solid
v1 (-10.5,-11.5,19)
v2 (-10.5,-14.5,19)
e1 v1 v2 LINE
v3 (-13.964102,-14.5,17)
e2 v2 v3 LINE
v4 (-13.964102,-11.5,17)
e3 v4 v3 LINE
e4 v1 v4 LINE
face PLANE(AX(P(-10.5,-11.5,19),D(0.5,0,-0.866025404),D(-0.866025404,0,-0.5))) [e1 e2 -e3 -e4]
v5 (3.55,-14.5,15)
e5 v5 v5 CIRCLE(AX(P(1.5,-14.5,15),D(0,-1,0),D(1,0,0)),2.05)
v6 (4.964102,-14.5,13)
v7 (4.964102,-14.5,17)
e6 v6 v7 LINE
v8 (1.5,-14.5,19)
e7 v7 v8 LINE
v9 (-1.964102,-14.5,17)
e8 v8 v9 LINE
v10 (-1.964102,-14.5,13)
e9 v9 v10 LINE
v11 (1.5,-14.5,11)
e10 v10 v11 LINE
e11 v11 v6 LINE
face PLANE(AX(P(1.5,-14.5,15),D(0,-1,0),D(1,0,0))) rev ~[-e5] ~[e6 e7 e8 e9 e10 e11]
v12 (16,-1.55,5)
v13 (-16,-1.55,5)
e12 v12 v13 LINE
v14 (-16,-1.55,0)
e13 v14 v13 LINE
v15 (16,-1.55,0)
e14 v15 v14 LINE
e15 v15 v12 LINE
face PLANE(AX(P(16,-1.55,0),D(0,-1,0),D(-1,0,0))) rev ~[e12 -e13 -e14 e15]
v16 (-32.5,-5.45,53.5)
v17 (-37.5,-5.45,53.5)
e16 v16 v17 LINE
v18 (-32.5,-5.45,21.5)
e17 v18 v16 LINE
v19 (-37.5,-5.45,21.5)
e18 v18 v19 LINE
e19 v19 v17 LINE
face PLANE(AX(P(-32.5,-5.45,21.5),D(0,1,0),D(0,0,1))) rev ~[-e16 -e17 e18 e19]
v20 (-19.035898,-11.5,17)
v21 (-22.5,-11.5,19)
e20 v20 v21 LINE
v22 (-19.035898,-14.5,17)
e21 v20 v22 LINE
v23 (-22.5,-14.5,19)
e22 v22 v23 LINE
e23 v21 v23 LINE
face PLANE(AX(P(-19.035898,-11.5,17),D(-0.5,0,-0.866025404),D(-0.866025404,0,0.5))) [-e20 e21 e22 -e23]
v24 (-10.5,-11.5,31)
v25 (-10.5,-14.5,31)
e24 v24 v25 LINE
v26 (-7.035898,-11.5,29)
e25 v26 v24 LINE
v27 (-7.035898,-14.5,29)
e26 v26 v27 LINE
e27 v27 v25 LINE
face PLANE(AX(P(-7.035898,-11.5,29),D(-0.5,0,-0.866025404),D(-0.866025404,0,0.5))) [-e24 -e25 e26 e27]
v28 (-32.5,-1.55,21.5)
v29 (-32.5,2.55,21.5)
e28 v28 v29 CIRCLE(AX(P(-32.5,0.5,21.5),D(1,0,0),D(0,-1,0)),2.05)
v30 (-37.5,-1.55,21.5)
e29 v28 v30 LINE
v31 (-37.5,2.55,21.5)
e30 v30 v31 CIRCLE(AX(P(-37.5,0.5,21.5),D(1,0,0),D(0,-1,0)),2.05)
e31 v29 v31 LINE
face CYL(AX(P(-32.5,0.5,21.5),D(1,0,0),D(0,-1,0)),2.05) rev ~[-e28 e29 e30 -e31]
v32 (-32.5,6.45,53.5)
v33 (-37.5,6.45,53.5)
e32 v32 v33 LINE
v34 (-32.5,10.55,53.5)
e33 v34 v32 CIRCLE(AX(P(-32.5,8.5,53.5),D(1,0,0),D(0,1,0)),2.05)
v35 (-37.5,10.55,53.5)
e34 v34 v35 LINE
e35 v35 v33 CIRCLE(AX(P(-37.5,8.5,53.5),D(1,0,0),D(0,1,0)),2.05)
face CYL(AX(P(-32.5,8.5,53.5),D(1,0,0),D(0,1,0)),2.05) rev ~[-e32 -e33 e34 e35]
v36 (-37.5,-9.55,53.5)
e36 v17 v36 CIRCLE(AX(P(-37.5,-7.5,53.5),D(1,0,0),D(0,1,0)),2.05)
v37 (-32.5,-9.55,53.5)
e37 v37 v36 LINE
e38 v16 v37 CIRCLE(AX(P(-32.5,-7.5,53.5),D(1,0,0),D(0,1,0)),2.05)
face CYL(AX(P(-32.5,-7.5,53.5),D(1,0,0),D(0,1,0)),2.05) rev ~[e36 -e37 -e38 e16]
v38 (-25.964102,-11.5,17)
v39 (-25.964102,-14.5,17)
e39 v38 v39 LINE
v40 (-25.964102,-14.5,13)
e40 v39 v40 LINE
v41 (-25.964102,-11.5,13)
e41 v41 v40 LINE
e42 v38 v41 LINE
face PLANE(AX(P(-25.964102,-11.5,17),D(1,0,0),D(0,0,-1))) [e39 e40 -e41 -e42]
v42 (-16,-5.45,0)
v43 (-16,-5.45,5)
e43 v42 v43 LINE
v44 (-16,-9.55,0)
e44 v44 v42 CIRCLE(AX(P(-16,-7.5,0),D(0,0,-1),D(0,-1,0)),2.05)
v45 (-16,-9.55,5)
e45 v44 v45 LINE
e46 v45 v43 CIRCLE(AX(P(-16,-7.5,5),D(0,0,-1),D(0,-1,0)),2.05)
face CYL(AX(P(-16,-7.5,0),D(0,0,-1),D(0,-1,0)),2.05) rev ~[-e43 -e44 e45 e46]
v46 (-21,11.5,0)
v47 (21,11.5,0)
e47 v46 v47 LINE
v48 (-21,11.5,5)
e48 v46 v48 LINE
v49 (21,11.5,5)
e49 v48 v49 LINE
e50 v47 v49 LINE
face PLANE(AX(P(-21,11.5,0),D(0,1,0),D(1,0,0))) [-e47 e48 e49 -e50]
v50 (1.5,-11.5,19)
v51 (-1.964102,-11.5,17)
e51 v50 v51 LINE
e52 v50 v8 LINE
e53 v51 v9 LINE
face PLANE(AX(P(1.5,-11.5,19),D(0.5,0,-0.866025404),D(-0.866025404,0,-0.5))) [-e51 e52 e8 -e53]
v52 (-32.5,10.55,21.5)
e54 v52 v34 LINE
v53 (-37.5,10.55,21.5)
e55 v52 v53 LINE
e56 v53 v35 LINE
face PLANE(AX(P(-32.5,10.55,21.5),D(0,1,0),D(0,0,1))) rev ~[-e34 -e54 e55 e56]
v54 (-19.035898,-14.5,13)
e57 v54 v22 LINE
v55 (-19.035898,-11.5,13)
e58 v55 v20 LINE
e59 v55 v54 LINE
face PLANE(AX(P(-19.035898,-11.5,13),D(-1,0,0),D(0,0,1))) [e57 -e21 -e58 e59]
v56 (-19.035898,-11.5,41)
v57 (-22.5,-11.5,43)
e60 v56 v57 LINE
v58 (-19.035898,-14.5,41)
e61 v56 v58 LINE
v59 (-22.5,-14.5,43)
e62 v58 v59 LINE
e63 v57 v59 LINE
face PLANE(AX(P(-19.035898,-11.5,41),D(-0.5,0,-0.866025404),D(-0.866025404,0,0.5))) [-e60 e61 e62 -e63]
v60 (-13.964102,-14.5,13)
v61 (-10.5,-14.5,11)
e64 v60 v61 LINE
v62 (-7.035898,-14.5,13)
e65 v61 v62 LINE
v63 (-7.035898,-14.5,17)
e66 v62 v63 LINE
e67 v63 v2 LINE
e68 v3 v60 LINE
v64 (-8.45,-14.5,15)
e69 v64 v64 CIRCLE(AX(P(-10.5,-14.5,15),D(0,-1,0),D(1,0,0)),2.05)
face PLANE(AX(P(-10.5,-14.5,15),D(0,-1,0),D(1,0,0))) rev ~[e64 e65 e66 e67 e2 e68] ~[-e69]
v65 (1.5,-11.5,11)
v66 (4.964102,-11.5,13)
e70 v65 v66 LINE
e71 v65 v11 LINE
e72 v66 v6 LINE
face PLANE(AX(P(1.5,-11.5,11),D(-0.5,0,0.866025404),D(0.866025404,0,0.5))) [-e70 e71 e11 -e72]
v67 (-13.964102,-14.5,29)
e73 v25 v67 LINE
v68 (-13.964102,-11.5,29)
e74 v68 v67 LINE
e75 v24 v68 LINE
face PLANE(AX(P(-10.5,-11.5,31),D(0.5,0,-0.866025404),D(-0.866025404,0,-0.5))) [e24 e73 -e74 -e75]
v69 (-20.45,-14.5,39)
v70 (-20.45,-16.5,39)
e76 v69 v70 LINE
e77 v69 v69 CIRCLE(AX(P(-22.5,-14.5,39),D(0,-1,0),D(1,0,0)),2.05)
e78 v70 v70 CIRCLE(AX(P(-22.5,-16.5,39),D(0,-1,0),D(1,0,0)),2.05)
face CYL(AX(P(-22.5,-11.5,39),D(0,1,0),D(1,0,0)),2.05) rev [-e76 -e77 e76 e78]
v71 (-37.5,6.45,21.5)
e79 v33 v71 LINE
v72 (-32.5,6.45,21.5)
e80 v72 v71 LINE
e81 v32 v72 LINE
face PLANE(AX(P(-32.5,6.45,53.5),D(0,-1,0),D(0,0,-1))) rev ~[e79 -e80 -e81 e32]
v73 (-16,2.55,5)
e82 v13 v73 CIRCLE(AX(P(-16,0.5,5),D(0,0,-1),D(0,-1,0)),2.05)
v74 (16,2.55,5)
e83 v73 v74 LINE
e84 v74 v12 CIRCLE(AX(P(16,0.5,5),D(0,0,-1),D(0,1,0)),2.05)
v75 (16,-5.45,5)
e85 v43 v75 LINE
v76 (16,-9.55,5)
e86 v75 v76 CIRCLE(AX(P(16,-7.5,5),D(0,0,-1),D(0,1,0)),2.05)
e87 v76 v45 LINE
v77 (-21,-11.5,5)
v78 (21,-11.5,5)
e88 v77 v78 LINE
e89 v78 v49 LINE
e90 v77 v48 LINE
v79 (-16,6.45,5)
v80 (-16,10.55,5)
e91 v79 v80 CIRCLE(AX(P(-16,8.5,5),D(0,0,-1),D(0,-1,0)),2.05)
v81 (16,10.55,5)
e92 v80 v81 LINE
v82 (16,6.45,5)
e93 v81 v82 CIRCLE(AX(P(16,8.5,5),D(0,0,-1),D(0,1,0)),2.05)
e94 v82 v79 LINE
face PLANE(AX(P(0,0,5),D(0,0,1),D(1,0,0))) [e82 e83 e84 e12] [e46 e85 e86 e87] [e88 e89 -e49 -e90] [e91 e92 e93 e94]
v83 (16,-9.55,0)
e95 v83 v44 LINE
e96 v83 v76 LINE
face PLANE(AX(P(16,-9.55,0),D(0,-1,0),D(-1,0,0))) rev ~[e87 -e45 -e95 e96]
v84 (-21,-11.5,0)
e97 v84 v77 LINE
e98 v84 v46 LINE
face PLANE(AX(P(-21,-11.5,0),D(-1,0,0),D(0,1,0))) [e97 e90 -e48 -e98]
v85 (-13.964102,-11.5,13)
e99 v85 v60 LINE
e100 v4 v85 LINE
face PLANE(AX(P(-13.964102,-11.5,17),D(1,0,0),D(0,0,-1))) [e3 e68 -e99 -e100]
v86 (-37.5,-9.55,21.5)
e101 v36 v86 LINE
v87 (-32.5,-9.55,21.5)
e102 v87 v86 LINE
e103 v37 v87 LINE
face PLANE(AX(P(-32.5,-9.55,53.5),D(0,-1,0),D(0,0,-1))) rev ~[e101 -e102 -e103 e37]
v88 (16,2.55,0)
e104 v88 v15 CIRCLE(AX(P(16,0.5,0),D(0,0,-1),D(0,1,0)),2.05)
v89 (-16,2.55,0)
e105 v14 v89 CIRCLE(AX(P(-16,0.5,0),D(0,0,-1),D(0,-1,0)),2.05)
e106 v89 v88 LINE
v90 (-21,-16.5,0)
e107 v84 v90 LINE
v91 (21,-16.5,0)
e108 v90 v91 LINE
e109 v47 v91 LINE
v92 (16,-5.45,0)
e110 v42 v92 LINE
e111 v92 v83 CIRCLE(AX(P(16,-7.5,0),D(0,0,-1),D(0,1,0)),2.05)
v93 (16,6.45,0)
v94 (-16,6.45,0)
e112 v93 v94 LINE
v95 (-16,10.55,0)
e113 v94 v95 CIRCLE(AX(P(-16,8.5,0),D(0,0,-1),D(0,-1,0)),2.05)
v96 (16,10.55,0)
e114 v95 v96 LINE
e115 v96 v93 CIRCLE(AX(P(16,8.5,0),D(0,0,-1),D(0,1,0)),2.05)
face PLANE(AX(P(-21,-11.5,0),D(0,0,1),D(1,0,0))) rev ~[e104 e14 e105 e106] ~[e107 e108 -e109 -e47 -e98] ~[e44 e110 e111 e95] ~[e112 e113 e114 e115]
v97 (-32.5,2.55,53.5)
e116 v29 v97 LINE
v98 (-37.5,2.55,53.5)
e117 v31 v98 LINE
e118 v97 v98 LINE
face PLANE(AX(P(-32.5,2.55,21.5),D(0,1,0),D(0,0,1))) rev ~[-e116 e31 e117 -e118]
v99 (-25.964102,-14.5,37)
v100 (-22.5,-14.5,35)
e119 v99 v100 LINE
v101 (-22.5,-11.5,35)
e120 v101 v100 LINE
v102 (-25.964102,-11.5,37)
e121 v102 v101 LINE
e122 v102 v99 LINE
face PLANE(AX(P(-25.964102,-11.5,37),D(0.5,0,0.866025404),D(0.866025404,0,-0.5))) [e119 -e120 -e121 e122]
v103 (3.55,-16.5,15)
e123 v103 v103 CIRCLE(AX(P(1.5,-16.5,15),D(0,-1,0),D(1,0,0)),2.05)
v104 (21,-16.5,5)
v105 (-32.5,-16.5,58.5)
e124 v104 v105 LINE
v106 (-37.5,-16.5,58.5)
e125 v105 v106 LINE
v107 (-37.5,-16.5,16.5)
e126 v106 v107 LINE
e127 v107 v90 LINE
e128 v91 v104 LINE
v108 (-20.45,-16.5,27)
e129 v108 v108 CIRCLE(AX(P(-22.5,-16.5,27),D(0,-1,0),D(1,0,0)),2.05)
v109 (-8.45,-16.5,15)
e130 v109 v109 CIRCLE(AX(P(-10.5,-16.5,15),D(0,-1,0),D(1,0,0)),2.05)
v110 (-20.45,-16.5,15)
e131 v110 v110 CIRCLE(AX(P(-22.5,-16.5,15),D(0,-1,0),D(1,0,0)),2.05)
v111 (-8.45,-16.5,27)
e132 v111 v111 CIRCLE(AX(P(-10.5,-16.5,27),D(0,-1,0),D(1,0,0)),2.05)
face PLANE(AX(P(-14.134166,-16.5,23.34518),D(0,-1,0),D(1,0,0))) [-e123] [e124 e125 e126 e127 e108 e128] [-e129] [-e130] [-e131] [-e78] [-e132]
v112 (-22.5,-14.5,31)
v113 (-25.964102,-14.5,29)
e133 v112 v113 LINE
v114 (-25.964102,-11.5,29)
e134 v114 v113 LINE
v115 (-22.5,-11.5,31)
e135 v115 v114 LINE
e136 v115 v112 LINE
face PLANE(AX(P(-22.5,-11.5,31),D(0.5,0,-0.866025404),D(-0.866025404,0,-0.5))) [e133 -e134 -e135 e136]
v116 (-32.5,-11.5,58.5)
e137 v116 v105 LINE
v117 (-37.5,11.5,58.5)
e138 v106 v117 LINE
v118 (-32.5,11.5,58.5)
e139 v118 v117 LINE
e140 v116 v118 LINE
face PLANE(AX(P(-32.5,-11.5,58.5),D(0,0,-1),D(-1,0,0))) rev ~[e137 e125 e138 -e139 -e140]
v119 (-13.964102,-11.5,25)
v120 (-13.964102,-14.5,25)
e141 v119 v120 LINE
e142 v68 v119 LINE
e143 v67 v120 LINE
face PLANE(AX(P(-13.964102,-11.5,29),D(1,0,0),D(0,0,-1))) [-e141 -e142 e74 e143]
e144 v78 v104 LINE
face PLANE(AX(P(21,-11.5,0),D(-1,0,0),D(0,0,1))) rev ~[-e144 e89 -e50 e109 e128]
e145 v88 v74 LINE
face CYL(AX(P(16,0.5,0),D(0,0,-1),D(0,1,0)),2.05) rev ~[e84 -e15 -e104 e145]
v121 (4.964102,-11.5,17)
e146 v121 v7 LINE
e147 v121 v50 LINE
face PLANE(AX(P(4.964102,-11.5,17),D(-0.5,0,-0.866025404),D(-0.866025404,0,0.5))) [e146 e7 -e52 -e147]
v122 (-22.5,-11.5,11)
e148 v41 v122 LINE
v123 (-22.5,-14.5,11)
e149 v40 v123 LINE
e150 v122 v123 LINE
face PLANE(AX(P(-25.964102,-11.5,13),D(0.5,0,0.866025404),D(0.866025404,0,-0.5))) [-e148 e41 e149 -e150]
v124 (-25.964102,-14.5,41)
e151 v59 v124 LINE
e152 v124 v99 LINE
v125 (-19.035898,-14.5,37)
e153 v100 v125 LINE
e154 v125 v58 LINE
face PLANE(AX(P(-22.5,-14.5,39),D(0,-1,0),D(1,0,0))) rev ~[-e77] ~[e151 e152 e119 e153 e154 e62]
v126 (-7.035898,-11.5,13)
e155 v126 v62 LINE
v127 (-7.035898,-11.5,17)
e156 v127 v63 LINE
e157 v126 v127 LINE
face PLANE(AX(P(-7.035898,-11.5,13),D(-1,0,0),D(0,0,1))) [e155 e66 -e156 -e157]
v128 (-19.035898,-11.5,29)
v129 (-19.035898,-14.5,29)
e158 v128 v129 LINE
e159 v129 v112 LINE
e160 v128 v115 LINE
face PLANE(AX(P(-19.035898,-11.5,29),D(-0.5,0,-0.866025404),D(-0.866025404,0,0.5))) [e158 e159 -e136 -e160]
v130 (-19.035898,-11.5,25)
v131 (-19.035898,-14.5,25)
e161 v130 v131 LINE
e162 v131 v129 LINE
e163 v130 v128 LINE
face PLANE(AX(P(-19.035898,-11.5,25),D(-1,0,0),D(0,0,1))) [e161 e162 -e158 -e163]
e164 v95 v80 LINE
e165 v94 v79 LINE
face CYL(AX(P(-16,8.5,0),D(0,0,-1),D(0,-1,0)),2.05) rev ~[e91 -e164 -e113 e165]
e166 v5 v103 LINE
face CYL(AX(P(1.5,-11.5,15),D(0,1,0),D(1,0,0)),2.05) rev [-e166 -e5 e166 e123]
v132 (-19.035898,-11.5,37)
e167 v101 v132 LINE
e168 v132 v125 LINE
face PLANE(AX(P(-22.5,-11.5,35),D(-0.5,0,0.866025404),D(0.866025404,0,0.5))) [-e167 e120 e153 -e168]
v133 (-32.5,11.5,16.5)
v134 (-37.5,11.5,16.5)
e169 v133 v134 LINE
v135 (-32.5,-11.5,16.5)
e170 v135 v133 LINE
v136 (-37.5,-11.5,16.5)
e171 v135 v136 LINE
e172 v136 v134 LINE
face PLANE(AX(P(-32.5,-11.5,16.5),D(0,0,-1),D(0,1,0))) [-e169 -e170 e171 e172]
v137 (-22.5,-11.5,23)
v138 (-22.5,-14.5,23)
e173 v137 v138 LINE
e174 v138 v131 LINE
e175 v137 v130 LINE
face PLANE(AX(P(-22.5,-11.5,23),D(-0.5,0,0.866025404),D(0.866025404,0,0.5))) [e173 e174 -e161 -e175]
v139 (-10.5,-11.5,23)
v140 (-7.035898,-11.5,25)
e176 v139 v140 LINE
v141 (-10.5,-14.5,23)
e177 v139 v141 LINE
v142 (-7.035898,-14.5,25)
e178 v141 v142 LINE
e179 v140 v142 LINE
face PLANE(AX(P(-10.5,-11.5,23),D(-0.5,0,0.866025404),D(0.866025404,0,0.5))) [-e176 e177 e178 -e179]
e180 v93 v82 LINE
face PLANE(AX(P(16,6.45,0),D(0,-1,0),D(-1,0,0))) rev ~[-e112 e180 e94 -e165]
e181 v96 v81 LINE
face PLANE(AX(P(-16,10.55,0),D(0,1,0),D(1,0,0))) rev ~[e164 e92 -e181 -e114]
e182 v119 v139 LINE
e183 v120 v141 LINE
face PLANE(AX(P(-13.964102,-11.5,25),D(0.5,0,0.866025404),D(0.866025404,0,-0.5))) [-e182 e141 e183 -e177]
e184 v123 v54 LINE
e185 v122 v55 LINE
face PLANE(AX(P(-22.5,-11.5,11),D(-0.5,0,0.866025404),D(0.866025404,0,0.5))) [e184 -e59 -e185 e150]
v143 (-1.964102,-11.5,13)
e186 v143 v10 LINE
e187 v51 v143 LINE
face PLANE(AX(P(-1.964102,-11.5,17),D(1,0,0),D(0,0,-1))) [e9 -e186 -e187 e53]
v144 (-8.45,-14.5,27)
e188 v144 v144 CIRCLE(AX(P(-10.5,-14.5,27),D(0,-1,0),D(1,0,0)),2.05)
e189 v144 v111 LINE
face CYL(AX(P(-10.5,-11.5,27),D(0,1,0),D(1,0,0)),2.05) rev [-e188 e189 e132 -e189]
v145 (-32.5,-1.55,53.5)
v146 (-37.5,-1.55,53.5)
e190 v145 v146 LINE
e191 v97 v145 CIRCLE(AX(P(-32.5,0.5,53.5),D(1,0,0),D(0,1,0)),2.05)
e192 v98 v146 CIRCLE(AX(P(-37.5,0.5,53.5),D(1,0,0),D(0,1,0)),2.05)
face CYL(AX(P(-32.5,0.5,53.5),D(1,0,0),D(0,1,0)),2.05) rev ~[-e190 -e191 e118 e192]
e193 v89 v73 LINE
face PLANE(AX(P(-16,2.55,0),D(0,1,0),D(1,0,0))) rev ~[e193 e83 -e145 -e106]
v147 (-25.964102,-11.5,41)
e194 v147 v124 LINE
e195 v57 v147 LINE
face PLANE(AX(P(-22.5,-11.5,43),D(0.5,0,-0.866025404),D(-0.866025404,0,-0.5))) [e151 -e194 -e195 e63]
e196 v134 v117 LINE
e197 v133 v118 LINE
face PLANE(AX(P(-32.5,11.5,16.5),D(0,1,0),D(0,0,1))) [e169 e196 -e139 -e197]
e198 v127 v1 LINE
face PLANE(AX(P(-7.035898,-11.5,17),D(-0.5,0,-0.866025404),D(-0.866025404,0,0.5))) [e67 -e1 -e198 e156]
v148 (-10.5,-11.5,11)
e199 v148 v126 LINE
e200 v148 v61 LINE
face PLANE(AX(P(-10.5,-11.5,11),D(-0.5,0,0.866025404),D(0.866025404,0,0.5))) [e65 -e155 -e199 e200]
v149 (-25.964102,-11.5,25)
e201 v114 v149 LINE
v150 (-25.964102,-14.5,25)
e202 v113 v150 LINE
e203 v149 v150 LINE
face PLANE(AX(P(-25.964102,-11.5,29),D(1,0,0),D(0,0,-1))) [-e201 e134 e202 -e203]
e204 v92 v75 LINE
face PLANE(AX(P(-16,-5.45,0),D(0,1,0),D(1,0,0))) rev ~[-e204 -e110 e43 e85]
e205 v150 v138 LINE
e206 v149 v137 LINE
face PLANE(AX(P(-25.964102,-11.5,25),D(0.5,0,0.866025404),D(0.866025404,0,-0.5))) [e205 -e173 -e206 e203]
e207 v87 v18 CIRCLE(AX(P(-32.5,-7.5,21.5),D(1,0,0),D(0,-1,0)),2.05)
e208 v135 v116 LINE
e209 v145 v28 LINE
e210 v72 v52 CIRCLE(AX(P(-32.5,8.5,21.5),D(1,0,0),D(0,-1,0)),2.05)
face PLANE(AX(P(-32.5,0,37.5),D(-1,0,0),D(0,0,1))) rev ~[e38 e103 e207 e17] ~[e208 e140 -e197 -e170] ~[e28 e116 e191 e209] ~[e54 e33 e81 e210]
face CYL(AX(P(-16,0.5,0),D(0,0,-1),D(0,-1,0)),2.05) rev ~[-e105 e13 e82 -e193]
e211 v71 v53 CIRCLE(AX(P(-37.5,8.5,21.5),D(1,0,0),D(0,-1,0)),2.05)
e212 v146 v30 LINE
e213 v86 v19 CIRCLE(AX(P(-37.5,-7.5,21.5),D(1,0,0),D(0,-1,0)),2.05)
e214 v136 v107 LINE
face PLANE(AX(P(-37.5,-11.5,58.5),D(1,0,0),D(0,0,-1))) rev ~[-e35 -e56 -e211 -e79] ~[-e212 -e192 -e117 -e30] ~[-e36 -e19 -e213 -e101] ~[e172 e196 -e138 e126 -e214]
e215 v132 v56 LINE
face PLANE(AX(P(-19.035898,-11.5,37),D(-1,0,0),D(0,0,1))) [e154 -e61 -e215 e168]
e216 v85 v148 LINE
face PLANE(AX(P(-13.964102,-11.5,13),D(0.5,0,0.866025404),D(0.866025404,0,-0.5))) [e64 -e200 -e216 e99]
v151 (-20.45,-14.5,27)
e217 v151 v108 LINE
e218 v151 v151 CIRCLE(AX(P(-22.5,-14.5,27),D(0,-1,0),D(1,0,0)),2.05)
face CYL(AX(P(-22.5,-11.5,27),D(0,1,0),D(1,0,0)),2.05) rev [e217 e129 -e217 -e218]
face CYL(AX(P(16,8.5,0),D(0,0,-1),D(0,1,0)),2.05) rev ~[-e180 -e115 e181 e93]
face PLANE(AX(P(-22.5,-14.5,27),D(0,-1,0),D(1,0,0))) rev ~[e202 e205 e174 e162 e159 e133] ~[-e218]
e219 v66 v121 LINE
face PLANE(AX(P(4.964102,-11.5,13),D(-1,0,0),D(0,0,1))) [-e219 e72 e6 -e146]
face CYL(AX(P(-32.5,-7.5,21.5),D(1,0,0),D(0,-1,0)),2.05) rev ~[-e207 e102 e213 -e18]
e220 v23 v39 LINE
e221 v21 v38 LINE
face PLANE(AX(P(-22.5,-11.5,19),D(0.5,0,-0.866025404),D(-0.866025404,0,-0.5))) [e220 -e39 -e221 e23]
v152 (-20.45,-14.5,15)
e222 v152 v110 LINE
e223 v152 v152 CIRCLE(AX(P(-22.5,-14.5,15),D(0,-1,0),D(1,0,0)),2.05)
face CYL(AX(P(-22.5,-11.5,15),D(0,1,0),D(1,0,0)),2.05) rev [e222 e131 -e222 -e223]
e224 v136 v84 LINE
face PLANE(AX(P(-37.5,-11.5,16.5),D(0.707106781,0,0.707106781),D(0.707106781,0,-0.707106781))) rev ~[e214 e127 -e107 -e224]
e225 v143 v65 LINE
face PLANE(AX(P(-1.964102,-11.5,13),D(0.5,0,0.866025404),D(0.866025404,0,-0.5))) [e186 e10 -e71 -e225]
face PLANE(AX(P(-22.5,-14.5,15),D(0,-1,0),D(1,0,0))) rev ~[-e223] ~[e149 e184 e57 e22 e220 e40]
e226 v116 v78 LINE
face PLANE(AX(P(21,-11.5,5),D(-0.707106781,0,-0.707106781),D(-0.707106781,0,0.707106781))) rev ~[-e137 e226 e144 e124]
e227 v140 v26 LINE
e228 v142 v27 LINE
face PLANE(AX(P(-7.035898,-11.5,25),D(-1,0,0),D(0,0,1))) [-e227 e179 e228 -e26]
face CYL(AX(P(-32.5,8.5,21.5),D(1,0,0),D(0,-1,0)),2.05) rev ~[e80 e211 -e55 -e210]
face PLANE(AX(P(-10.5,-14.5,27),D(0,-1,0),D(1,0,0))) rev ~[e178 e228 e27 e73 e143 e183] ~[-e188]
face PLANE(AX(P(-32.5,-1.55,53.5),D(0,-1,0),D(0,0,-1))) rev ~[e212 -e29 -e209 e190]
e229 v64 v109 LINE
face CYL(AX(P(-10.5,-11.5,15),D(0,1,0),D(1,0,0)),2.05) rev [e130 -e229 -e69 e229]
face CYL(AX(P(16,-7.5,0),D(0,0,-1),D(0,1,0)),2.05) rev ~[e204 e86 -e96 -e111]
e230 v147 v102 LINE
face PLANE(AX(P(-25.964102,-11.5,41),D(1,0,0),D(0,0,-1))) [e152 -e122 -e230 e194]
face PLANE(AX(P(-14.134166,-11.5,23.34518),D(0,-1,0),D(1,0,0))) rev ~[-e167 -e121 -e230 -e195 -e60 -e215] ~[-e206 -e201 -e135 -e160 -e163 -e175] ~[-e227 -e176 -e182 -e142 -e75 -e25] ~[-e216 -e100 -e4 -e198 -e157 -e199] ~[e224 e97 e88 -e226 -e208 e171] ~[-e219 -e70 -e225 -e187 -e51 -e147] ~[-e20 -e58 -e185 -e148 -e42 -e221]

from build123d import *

# Parameters (mm, degrees)
F0_W      = 42
F0_H      = 23
F1_DEPTH  = 5
F3_ANGLE  = 90
F8_R      = 2.05
F9_DEPTH  = 5
F10_DEPTH = 3


# Not quite as in the source:
# - a feature names something its author has since deleted; it is built from what else it names


with BuildPart() as f1:
    # F0 (on Top) → F1 (new body)
    with BuildSketch(Plane.XY):
        Rectangle(F0_W, F0_H)
        with BuildLine():
            ThreePointArc((-16, -9.55), (-18.05, -7.5), (-16, -5.45))
            Line((-16, -5.45), (16, -5.45))
            ThreePointArc((16, -5.45), (18.05, -7.5), (16, -9.55))
            Line((16, -9.55), (-16, -9.55))
        make_face(mode=Mode.SUBTRACT)
        with BuildLine():
            Line((0, -1.55), (-16, -1.55))
            ThreePointArc((-16, -1.55), (-18.05, 0.5), (-16, 2.55))
            Line((-16, 2.55), (0, 2.55))
            Line((0, 2.55), (16, 2.55))
            ThreePointArc((16, 2.55), (18.05, 0.5), (16, -1.55))
            Line((16, -1.55), (0, -1.55))
        make_face(mode=Mode.SUBTRACT)
        with BuildLine():
            Line((16, 6.45), (-16, 6.45))
            ThreePointArc((-16, 6.45), (-18.05, 8.5), (-16, 10.55))
            Line((-16, 10.55), (16, 10.55))
            ThreePointArc((16, 10.55), (18.05, 8.5), (16, 6.45))
        make_face(mode=Mode.SUBTRACT)
    extrude(amount=F1_DEPTH)


with BuildPart() as f3_1:
    # F3: copy of F1
    add(f1.part.rotate(Axis((-21, 0, 2.5), (0, -1, 0)), F3_ANGLE))


with BuildPart() as f3_1_1:
    # F4: moved
    add(f3_1.part.moved(Location((0, 0, 14))))


with BuildPart() as f3_1_2:
    # F5: moved
    add(f3_1_1.part.moved(Location((-14, 0, 0))))


with BuildPart() as f1_1:
    add(f1.part)

    add(f3_1_2.part)  # F9 merges F3_1
    # F8 (on 3pt) → F9 (join)
    with BuildSketch(Plane.XZ.offset(11.5)):
        Polygon((-37.5, 16.5), (-21, 0), (21, 0), (21, 5), (14.4509618943, 11.5490381057), (13.5, 11), (10.0358983849, 13), (10.0358983849, 15.9641016151), (2.4509618943, 23.5490381057), (1.5, 23), (-1.9641016151, 25), (-1.9641016151, 27.9641016151), (-9.5490381057, 35.5490381057), (-10.5, 35), (-13.9641016151, 37), (-13.9641016151, 39.9641016151), (-21.5490381057, 47.5490381057), (-22.5, 47), (-25.9641016151, 49), (-25.9641016151, 51.9641016151), (-32.5, 58.5), (-37.5, 58.5), align=None)
        Polygon((-25.9641016151, 17), (-22.5, 19), (-19.0358983849, 17), (-19.0358983849, 13), (-22.5, 11), (-25.9641016151, 13), align=None, mode=Mode.SUBTRACT)
        Polygon((-13.9641016151, 13), (-13.9641016151, 17), (-10.5, 19), (-7.0358983849, 17), (-7.0358983849, 13), (-10.5, 11), align=None, mode=Mode.SUBTRACT)
        Polygon((-25.9641016151, 25), (-25.9641016151, 29), (-22.5, 31), (-19.0358983849, 29), (-19.0358983849, 25), (-22.5, 23), align=None, mode=Mode.SUBTRACT)
        Polygon((-13.9641016151, 25), (-13.9641016151, 29), (-10.5, 31), (-7.0358983849, 29), (-7.0358983849, 25), (-10.5, 23), align=None, mode=Mode.SUBTRACT)
        Polygon((-1.9641016151, 13), (-1.9641016151, 17), (1.5, 19), (4.9641016151, 17), (4.9641016151, 13), (1.5, 11), align=None, mode=Mode.SUBTRACT)
        Polygon((-25.9641016151, 37), (-25.9641016151, 41), (-22.5, 43), (-19.0358983849, 41), (-19.0358983849, 37), (-22.5, 35), align=None, mode=Mode.SUBTRACT)
        with BuildLine():
            Line((13.5, 11), (14.4509618943, 11.5490381057))
            Line((14.4509618943, 11.5490381057), (12.9839959128, 13.0160040872))
            ThreePointArc((12.9839959128, 13.0160040872), (12.0504310986, 13.5504310986), (11.5160040872, 14.4839959128))
            Line((11.5160040872, 14.4839959128), (10.0358983849, 15.9641016151))
            Line((10.0358983849, 15.9641016151), (10.0358983849, 13))
            Line((10.0358983849, 13), (13.5, 11))
        make_face()
        with BuildLine():
            Line((-24.4839959128, 50.4839959128), (-25.9641016151, 51.9641016151))
            Line((-25.9641016151, 51.9641016151), (-25.9641016151, 49))
            Line((-25.9641016151, 49), (-22.5, 47))
            Line((-22.5, 47), (-21.5490381057, 47.5490381057))
            Line((-21.5490381057, 47.5490381057), (-23.0160040872, 49.0160040872))
            ThreePointArc((-23.0160040872, 49.0160040872), (-23.9495689014, 49.5504310986), (-24.4839959128, 50.4839959128))
        make_face()
        with BuildLine():
            ThreePointArc((11.5160040872, 14.4839959128), (12.0504310986, 13.5504310986), (12.9839959128, 13.0160040872))
            Line((12.9839959128, 13.0160040872), (11.5160040872, 14.4839959128))
        make_face()
        with BuildLine():
            Line((-23.0160040872, 49.0160040872), (-24.4839959128, 50.4839959128))
            ThreePointArc((-24.4839959128, 50.4839959128), (-23.9495689014, 49.5504310986), (-23.0160040872, 49.0160040872))
        make_face()
        with BuildLine():
            Line((1.5, 23), (2.4509618943, 23.5490381057))
            Line((2.4509618943, 23.5490381057), (0.9839959128, 25.0160040872))
            ThreePointArc((0.9839959128, 25.0160040872), (0.0504310986, 25.5504310986), (-0.4839959128, 26.4839959128))
            Line((-0.4839959128, 26.4839959128), (-1.9641016151, 27.9641016151))
            Line((-1.9641016151, 27.9641016151), (-1.9641016151, 25))
            Line((-1.9641016151, 25), (1.5, 23))
        make_face()
        with BuildLine():
            Line((-12.4839959128, 38.4839959128), (-13.9641016151, 39.9641016151))
            Line((-13.9641016151, 39.9641016151), (-13.9641016151, 37))
            Line((-13.9641016151, 37), (-10.5, 35))
            Line((-10.5, 35), (-9.5490381057, 35.5490381057))
            Line((-9.5490381057, 35.5490381057), (-11.0160040872, 37.0160040872))
            ThreePointArc((-11.0160040872, 37.0160040872), (-11.9495689014, 37.5504310986), (-12.4839959128, 38.4839959128))
        make_face()
        with BuildLine():
            ThreePointArc((-0.4839959128, 26.4839959128), (0.0504310986, 25.5504310986), (0.9839959128, 25.0160040872))
            Line((0.9839959128, 25.0160040872), (-0.4839959128, 26.4839959128))
        make_face()
        with BuildLine():
            Line((-11.0160040872, 37.0160040872), (-12.4839959128, 38.4839959128))
            ThreePointArc((-12.4839959128, 38.4839959128), (-11.9495689014, 37.5504310986), (-11.0160040872, 37.0160040872))
        make_face()
        Polygon((-10.5, 31), (-13.9641016151, 29), (-13.9641016151, 25), (-10.5, 23), (-7.0358983849, 25), (-7.0358983849, 29), align=None)
        with Locations((-10.5, 27)):
            Circle(F8_R, mode=Mode.SUBTRACT)
        Polygon((-22.5, 31), (-25.9641016151, 29), (-25.9641016151, 25), (-22.5, 23), (-19.0358983849, 25), (-19.0358983849, 29), align=None)
        with Locations((-22.5, 27)):
            Circle(F8_R, mode=Mode.SUBTRACT)
        Polygon((-22.5, 43), (-25.9641016151, 41), (-25.9641016151, 37), (-22.5, 35), (-19.0358983849, 37), (-19.0358983849, 41), align=None)
        with Locations((-22.5, 39)):
            Circle(F8_R, mode=Mode.SUBTRACT)
        Polygon((-10.5, 19), (-13.9641016151, 17), (-13.9641016151, 13), (-10.5, 11), (-7.0358983849, 13), (-7.0358983849, 17), align=None)
        with Locations((-10.5, 15)):
            Circle(F8_R, mode=Mode.SUBTRACT)
        Polygon((1.5, 19), (-1.9641016151, 17), (-1.9641016151, 13), (1.5, 11), (4.9641016151, 13), (4.9641016151, 17), align=None)
        with Locations((1.5, 15)):
            Circle(F8_R, mode=Mode.SUBTRACT)
        Polygon((-19.0358983849, 17), (-22.5, 19), (-25.9641016151, 17), (-25.9641016151, 13), (-22.5, 11), (-19.0358983849, 13), align=None)
        with Locations((-22.5, 15)):
            Circle(F8_R, mode=Mode.SUBTRACT)
    extrude(amount=F9_DEPTH)

    # F8 (on 3pt) → F10 (cut)
    with BuildSketch(Plane.XZ.offset(11.5)):
        Polygon((-10.5, 31), (-13.9641016151, 29), (-13.9641016151, 25), (-10.5, 23), (-7.0358983849, 25), (-7.0358983849, 29), align=None)
        with Locations((-10.5, 27)):
            Circle(F8_R, mode=Mode.SUBTRACT)
        Polygon((-22.5, 31), (-25.9641016151, 29), (-25.9641016151, 25), (-22.5, 23), (-19.0358983849, 25), (-19.0358983849, 29), align=None)
        with Locations((-22.5, 27)):
            Circle(F8_R, mode=Mode.SUBTRACT)
        Polygon((-22.5, 43), (-25.9641016151, 41), (-25.9641016151, 37), (-22.5, 35), (-19.0358983849, 37), (-19.0358983849, 41), align=None)
        with Locations((-22.5, 39)):
            Circle(F8_R, mode=Mode.SUBTRACT)
        Polygon((-10.5, 19), (-13.9641016151, 17), (-13.9641016151, 13), (-10.5, 11), (-7.0358983849, 13), (-7.0358983849, 17), align=None)
        with Locations((-10.5, 15)):
            Circle(F8_R, mode=Mode.SUBTRACT)
        Polygon((1.5, 19), (-1.9641016151, 17), (-1.9641016151, 13), (1.5, 11), (4.9641016151, 13), (4.9641016151, 17), align=None)
        with Locations((1.5, 15)):
            Circle(F8_R, mode=Mode.SUBTRACT)
        with BuildLine():
            Line((0.9839959128, 25.0160040872), (2.4509618943, 23.5490381057))
            Line((2.4509618943, 23.5490381057), (4.9641016151, 25))
            Line((4.9641016151, 25), (4.9641016151, 29))
            Line((4.9641016151, 29), (1.5, 31))
            Line((1.5, 31), (-1.9641016151, 29))
            Line((-1.9641016151, 29), (-1.9641016151, 27.9641016151))
            Line((-1.9641016151, 27.9641016151), (-0.4839959128, 26.4839959128))
            ThreePointArc((-0.4839959128, 26.4839959128), (1.2398958105, 29.0334320275), (3.55, 27))
            ThreePointArc((3.55, 27), (2.7539321396, 25.3782249881), (0.9839959128, 25.0160040872))
        make_face()
        with BuildLine():
            Line((12.9839959128, 13.0160040872), (14.4509618943, 11.5490381057))
            Line((14.4509618943, 11.5490381057), (16.9641016151, 13))
            Line((16.9641016151, 13), (16.9641016151, 17))
            Line((16.9641016151, 17), (13.5, 19))
            Line((13.5, 19), (10.0358983849, 17))
            Line((10.0358983849, 17), (10.0358983849, 15.9641016151))
            Line((10.0358983849, 15.9641016151), (11.5160040872, 14.4839959128))
            ThreePointArc((11.5160040872, 14.4839959128), (13.2398958105, 17.0334320275), (15.55, 15))
            ThreePointArc((15.55, 15), (14.7539321396, 13.3782249881), (12.9839959128, 13.0160040872))
        make_face()
        Polygon((-19.0358983849, 17), (-22.5, 19), (-25.9641016151, 17), (-25.9641016151, 13), (-22.5, 11), (-19.0358983849, 13), align=None)
        with Locations((-22.5, 15)):
            Circle(F8_R, mode=Mode.SUBTRACT)
    extrude(amount=F10_DEPTH, mode=Mode.SUBTRACT)


solid = f1_1.part
